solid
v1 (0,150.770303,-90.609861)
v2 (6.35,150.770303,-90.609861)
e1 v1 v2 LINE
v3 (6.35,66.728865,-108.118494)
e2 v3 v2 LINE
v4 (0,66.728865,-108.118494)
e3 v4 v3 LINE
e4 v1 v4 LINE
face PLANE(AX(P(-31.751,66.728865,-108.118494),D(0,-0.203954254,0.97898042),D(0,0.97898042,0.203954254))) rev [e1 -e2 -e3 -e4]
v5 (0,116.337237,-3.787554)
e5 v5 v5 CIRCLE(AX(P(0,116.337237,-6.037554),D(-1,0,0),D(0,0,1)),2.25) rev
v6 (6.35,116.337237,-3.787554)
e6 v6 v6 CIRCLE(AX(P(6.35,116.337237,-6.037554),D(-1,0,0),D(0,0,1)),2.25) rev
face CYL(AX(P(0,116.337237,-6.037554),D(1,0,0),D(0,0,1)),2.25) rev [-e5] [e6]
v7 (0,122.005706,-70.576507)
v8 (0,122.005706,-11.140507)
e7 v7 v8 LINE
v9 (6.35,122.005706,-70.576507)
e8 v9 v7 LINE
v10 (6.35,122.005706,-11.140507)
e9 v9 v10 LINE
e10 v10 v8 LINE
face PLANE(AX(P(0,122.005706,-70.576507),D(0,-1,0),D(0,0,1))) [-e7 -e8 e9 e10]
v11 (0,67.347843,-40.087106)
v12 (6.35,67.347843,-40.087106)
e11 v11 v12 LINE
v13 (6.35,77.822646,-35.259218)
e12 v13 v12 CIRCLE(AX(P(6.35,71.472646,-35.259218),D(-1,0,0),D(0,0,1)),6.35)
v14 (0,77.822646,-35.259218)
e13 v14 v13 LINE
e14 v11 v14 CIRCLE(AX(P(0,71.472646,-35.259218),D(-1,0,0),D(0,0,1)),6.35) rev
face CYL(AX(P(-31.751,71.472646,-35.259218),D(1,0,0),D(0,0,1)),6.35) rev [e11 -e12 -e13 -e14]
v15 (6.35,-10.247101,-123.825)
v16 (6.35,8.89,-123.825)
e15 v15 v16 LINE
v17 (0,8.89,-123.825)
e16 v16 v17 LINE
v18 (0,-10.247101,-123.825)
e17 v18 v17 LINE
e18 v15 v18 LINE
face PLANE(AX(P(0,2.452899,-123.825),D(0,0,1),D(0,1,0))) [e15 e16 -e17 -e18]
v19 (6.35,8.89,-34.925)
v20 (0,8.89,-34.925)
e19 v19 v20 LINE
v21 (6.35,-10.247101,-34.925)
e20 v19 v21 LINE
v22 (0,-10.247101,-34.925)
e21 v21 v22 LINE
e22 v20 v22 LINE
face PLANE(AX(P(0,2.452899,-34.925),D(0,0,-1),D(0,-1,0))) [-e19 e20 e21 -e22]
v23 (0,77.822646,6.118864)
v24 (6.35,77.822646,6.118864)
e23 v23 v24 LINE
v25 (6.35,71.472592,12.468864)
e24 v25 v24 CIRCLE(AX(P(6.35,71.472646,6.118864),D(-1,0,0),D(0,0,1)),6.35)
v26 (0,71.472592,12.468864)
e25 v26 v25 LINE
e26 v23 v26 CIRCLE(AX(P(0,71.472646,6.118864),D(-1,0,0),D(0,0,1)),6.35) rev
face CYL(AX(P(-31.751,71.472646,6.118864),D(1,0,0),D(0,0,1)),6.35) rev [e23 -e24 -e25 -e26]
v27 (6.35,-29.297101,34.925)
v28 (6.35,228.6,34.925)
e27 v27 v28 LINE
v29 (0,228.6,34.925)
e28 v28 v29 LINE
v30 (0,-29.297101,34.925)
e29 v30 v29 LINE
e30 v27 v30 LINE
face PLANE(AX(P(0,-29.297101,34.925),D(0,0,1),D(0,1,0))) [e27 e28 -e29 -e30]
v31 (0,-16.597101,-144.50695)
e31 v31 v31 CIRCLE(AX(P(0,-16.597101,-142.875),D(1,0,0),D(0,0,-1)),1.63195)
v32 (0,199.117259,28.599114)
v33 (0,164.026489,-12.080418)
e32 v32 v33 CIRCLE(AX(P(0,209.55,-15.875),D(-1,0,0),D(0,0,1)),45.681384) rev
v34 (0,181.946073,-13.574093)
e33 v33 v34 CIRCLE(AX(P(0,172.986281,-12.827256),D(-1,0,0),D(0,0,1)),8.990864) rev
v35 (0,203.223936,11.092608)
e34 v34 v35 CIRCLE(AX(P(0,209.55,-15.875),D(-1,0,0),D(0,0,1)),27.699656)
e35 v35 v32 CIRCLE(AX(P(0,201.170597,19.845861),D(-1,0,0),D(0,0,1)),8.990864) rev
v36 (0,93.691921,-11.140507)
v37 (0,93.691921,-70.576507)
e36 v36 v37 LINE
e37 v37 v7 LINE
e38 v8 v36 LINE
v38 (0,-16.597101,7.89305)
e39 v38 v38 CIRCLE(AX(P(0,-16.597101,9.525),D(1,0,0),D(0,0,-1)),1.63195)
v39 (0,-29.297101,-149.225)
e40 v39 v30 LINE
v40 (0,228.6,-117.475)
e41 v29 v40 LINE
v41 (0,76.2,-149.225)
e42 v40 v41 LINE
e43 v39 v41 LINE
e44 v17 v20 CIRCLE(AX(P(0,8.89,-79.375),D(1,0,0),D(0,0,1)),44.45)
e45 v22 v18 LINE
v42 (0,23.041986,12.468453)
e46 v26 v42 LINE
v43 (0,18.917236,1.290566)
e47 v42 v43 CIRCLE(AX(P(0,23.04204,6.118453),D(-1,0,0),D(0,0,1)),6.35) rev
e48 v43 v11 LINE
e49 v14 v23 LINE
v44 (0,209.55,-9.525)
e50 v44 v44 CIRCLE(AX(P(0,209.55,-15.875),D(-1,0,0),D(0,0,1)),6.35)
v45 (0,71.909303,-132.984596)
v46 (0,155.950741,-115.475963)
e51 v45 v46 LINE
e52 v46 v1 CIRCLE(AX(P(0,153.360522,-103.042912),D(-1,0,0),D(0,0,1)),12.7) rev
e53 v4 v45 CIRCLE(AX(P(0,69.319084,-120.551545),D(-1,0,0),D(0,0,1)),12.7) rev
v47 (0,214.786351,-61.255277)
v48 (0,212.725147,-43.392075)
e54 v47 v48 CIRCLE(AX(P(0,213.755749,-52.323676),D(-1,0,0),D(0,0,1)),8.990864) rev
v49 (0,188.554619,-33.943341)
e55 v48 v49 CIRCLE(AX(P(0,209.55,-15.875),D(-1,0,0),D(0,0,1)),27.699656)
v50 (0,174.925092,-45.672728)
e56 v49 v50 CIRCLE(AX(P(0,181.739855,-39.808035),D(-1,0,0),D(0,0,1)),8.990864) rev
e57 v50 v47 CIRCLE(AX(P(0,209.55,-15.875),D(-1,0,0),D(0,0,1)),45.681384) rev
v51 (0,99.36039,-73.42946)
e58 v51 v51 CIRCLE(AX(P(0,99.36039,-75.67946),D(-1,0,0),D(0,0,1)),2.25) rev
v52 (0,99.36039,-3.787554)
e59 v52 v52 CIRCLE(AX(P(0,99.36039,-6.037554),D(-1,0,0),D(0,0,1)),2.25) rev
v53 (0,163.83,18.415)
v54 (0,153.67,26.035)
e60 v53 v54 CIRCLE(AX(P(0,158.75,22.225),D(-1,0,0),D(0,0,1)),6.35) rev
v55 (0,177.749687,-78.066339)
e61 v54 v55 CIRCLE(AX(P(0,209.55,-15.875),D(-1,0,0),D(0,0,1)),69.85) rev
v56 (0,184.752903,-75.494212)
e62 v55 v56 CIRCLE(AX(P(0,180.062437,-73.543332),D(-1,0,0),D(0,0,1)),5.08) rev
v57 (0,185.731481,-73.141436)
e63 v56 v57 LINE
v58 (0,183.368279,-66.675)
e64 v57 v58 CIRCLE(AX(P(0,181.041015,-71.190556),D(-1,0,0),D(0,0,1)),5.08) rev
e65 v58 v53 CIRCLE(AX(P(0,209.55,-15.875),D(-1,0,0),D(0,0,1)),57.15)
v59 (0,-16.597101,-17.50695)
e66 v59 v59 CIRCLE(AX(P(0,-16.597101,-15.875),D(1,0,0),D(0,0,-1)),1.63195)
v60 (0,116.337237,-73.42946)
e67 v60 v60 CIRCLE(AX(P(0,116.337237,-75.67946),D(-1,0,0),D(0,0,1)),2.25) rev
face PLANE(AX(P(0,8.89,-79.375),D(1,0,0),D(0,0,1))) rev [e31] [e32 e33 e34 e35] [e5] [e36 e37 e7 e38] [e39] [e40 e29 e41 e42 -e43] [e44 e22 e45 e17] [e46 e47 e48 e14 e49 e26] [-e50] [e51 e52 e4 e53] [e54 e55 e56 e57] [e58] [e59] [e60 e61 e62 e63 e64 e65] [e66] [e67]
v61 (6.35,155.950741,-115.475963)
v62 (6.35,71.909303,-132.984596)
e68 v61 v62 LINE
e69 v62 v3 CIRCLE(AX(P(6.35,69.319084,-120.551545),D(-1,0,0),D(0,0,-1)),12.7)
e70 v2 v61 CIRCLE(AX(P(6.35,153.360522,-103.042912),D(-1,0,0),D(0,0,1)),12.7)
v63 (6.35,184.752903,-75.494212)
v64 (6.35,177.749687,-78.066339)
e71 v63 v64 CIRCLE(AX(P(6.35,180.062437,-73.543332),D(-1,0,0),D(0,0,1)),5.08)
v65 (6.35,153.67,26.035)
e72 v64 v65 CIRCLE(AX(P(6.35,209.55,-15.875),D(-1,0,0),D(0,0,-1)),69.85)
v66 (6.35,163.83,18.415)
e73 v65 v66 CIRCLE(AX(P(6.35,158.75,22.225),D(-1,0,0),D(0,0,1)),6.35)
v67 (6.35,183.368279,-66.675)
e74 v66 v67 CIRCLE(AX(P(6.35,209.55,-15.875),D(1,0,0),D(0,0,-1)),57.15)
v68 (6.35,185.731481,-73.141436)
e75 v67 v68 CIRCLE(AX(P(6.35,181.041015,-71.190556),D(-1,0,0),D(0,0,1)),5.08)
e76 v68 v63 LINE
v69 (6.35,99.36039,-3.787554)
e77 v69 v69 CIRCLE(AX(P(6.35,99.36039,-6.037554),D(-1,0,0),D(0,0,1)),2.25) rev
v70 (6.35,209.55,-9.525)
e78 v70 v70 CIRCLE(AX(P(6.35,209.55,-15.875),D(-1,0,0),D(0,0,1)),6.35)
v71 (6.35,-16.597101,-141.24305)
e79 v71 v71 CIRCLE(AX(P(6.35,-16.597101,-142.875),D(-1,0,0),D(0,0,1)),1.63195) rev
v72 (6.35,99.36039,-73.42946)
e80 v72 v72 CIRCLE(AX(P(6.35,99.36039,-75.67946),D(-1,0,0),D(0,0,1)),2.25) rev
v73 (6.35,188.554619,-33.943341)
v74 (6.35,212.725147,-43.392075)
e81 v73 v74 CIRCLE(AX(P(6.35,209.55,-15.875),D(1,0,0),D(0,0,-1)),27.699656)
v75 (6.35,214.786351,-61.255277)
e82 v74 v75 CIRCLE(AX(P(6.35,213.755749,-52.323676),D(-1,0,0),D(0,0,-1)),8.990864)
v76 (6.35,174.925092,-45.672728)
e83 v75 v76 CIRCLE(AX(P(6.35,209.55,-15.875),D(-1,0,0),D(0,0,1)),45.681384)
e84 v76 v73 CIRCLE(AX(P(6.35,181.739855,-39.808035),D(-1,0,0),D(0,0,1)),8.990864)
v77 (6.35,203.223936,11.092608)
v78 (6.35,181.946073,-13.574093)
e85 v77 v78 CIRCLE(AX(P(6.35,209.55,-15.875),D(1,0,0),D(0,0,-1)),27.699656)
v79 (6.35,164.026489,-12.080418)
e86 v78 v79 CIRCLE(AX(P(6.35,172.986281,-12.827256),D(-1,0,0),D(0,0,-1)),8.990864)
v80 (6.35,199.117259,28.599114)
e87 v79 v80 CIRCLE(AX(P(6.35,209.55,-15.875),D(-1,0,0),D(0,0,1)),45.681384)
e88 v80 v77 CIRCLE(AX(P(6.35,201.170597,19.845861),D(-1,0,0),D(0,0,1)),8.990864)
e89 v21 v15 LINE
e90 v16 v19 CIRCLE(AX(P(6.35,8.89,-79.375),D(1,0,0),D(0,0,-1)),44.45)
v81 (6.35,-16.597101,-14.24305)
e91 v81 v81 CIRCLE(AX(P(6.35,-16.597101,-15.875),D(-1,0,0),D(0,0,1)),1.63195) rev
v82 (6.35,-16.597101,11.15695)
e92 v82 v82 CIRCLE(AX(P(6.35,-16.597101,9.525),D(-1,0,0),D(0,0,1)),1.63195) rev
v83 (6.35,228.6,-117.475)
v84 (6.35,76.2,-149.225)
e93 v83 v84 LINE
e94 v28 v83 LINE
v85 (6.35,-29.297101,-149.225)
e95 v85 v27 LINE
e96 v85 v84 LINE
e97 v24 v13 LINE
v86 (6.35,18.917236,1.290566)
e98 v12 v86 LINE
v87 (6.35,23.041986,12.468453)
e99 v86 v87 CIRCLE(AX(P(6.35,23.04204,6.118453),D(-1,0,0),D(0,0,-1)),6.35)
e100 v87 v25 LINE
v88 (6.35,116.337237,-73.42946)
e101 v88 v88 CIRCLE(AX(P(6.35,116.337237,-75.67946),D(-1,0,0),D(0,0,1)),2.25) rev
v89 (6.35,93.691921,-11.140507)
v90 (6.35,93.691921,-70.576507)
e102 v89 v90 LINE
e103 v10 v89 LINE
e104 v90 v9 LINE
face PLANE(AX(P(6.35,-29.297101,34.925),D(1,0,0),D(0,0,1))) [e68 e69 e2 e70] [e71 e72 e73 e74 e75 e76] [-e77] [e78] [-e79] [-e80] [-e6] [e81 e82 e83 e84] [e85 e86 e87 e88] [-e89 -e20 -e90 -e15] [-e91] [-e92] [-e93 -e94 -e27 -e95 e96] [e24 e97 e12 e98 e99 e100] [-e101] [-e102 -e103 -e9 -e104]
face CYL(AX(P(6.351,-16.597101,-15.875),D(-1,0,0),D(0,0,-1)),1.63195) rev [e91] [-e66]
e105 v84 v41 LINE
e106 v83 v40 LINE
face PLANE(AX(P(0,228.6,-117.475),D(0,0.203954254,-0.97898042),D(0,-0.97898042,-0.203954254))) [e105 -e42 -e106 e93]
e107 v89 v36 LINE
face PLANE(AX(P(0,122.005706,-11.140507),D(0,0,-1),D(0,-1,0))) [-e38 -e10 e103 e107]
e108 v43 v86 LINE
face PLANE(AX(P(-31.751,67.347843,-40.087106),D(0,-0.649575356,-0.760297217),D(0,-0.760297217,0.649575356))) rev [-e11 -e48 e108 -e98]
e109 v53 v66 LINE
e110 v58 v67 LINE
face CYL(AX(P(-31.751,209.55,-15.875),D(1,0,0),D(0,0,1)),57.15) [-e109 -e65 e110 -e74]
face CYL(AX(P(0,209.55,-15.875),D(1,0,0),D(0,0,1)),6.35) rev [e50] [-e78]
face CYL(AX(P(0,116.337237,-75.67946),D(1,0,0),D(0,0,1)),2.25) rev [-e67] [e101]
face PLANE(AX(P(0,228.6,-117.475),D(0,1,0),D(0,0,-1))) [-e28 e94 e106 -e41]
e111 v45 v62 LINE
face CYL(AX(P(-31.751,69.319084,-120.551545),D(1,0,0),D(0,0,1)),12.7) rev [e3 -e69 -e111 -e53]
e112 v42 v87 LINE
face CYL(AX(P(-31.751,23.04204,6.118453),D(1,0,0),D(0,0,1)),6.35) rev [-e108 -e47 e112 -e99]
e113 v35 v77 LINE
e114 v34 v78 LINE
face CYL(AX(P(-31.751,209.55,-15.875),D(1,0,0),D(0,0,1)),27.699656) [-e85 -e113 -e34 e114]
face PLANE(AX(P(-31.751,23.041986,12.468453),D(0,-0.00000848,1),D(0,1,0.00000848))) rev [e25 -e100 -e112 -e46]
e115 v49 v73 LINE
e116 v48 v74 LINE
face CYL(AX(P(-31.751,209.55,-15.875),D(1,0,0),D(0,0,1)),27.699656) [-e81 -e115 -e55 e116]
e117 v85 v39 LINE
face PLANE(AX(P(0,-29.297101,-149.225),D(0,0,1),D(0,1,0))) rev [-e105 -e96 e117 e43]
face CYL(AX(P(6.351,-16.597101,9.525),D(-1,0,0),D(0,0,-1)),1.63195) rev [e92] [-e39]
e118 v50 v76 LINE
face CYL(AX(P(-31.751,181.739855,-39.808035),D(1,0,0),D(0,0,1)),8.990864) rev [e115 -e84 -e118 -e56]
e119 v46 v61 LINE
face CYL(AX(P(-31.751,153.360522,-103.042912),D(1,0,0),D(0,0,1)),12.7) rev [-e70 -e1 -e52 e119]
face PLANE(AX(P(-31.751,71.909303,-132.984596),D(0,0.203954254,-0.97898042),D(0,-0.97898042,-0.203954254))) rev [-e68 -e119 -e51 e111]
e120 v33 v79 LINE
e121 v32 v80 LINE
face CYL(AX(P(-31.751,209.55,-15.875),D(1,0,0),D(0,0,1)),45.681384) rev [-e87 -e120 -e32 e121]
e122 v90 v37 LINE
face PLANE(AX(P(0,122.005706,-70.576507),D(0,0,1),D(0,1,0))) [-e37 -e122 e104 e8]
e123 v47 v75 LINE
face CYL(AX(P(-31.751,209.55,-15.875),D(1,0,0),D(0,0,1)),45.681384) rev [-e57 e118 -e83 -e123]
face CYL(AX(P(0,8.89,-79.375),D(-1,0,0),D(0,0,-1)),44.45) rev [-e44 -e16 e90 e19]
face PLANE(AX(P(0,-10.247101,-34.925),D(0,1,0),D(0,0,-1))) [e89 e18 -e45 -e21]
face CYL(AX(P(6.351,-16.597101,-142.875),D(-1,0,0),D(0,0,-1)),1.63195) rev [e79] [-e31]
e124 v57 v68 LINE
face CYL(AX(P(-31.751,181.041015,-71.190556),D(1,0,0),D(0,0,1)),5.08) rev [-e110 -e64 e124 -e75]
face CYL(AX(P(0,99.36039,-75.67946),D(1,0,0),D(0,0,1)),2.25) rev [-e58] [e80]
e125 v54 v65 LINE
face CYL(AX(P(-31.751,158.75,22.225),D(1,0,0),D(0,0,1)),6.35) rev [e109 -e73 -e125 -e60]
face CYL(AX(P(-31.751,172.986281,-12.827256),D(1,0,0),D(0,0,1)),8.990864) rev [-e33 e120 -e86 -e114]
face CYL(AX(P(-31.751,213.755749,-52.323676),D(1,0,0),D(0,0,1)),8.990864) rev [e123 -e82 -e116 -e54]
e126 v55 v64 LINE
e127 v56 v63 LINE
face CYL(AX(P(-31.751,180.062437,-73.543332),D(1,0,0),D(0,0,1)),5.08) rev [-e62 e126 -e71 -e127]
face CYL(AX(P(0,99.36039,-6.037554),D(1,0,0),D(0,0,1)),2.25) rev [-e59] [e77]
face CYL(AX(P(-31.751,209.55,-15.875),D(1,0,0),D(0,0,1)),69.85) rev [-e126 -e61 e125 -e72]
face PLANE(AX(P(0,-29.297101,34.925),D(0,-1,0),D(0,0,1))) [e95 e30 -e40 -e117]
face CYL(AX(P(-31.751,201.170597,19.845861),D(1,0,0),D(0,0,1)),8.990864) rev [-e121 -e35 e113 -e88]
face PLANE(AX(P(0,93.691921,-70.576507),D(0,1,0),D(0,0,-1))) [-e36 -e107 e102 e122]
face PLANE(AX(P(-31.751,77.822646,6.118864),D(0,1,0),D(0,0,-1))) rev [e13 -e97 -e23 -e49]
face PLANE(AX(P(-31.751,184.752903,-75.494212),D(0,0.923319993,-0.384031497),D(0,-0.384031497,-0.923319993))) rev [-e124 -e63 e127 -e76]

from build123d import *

# Parameters (mm, degrees)
BOSS_EXTRUDE1_DEPTH           = 6.35
SKETCH5_W                     = 184.15
SKETCH5_H                     = 6.35
BOSS_EXTRUDE4_DEPTH           = 31.75
SKETCH6_W                     = 12.7
SKETCH6_H                     = 88.9
CUT_EXTRUDE2_DEPTH            = 270.576010849
CUT_EXTRUDE3_REACH            = 277.64
SKETCH7_R                     = 2.25
SKETCH7_W                     = 59.436
SKETCH7_H                     = 28.313784743
SKETCH8_R                     = 6.35
CUT_EXTRUDE4_DEPTH            = 276.640473489
FILLET1_R                     = 2.54
CONVERT_SOLID1_START          = -34.925
CONVERT_SOLID1_DEPTH          = 184.15
CUT_EXTRUDE5_REACH            = 277.64
CUT_EXTRUDE6_REACH            = 271.576
SKETCH10_R                    = 1.63195
FLAT_PATTERN1_START           = -31.75
FLAT_PATTERN1_DEPTH           = 31.75
FLAT_PATTERN1_2_OUTLINE_R     = 1.63195
FLAT_PATTERN1_2_DEPTH         = 6.35
BODY_MOVE_COPY1_OUTLINE_R     = 1.63195
BODY_MOVE_COPY1_OUTLINE_R_2   = 2.25
BODY_MOVE_COPY1_OUTLINE_W     = 28.313784743
BODY_MOVE_COPY1_OUTLINE_H     = 23.784493131
BODY_MOVE_COPY1_DEPTH         = 6.35
BODY_MOVE_COPY1_2_OUTLINE_R   = 1.63195
BODY_MOVE_COPY1_2_OUTLINE_R_2 = 2.25
BODY_MOVE_COPY1_2_OUTLINE_W   = 28.313784743
BODY_MOVE_COPY1_2_OUTLINE_H   = 23.784493131
BODY_MOVE_COPY1_2_DEPTH       = 6.35


# Read off the part's stored shape, not the designer's step: Convert-Solid1, Flat-Pattern1, Body-Move/Copy1
with BuildPart() as part:
    # Sketch1 → Boss-Extrude1 (new body)
    with BuildSketch(Plane(origin=(0, 0, 0), x_dir=(0, 0, -1), z_dir=(1, 0, 0))):
        with BuildLine():
            Line((-117.475, 228.6), (34.925, 228.6))
            Line((34.925, 228.6), (34.925, 8.89))
            Line((34.925, 8.89), (34.925, 0))
            Line((34.925, 0), (-34.925, 0))
            Line((-34.925, 0), (-34.925, 8.89))
            ThreePointArc((-34.925, 8.89), (-79.375, 53.34), (-123.825, 8.89))
            Line((-123.825, 8.89), (-123.825, 0))
            Line((-123.825, 0), (-149.225, 0))
            Line((-149.225, 0), (-149.225, 76.2))
            Line((-149.225, 76.2), (-117.475, 228.6))
        make_face()
    extrude(amount=BOSS_EXTRUDE1_DEPTH)

    # Sketch5 → Boss-Extrude4 (add)
    with BuildSketch(Plane.ZY):
        with Locations((57.15, 3.175)):
            Rectangle(SKETCH5_W, SKETCH5_H)
    extrude(amount=BOSS_EXTRUDE4_DEPTH)

    # Sketch6 → Cut-Extrude2 (cut, through all)
    with BuildSketch(Plane(origin=(0, 6.35, 0), x_dir=(1, 0, 0), z_dir=(0, 1, 0))):
        with Locations((-6.35, -79.375)):
            Rectangle(SKETCH6_W, SKETCH6_H)
    extrude(amount=-CUT_EXTRUDE2_DEPTH, mode=Mode.SUBTRACT)

    # Sketch7 → Cut-Extrude3 (cut, up to next)
    with BuildSketch(Plane(origin=(6.35, 0, 0), x_dir=(0, 0, -1), z_dir=(1, 0, 0)), mode=Mode.PRIVATE) as cut_extrude3_sk1:
        with Locations((-75.679460058, 116.337237118)):
            Circle(SKETCH7_R)
    cut_extrude3_tool1 = extrude(cut_extrude3_sk1.sketch, amount=-CUT_EXTRUDE3_REACH, mode=Mode.PRIVATE) & part.part
    # Sketch7 → Cut-Extrude3 (cut, up to next)
    with BuildSketch(Plane(origin=(6.35, 0, 0), x_dir=(0, 0, -1), z_dir=(1, 0, 0)), mode=Mode.PRIVATE) as cut_extrude3_sk2:
        with Locations((-75.679460058, 99.360389657)):
            Circle(SKETCH7_R)
    cut_extrude3_tool2 = extrude(cut_extrude3_sk2.sketch, amount=-CUT_EXTRUDE3_REACH, mode=Mode.PRIVATE) & part.part
    # Sketch7 → Cut-Extrude3 (cut, up to next)
    with BuildSketch(Plane(origin=(6.35, 0, 0), x_dir=(0, 0, -1), z_dir=(1, 0, 0)), mode=Mode.PRIVATE) as cut_extrude3_sk3:
        with Locations((-6.03755368, 99.360389657)):
            Circle(SKETCH7_R)
    cut_extrude3_tool3 = extrude(cut_extrude3_sk3.sketch, amount=-CUT_EXTRUDE3_REACH, mode=Mode.PRIVATE) & part.part
    # Sketch7 → Cut-Extrude3 (cut, up to next)
    with BuildSketch(Plane(origin=(6.35, 0, 0), x_dir=(0, 0, -1), z_dir=(1, 0, 0)), mode=Mode.PRIVATE) as cut_extrude3_sk4:
        with Locations((-6.03755368, 116.337237118)):
            Circle(SKETCH7_R)
    cut_extrude3_tool4 = extrude(cut_extrude3_sk4.sketch, amount=-CUT_EXTRUDE3_REACH, mode=Mode.PRIVATE) & part.part
    # Sketch7 → Cut-Extrude3 (cut, up to next)
    with BuildSketch(Plane(origin=(6.35, 0, 0), x_dir=(0, 0, -1), z_dir=(1, 0, 0)), mode=Mode.PRIVATE) as cut_extrude3_sk5:
        with Locations((-40.858506869, 107.848813388)):
            Rectangle(SKETCH7_W, SKETCH7_H)
    cut_extrude3_tool5 = extrude(cut_extrude3_sk5.sketch, amount=-CUT_EXTRUDE3_REACH, mode=Mode.PRIVATE) & part.part
    add(cut_extrude3_tool1.solids().sort_by_distance((6.35, 116.337237, 75.67946))[0], mode=Mode.SUBTRACT)
    add(cut_extrude3_tool2.solids().sort_by_distance((6.35, 99.36039, 75.67946))[0], mode=Mode.SUBTRACT)
    add(cut_extrude3_tool3.solids().sort_by_distance((6.35, 99.36039, 6.037554))[0], mode=Mode.SUBTRACT)
    add(cut_extrude3_tool4.solids().sort_by_distance((6.35, 116.337237, 6.037554))[0], mode=Mode.SUBTRACT)
    add(cut_extrude3_tool5.solids().sort_by_distance((6.35, 107.848813, 40.858507))[0], mode=Mode.SUBTRACT)

    # Sketch8 → Cut-Extrude4 (cut, through all)
    with BuildSketch(Plane(origin=(6.35, 0, 0), x_dir=(0, 0, -1), z_dir=(1, 0, 0))):
        with Locations((-15.875, 209.55)):
            Circle(SKETCH8_R)
    extrude(amount=-CUT_EXTRUDE4_DEPTH, mode=Mode.SUBTRACT)

    # Fillet1
    fillet1_edges = [part.edges().sort_by_distance(p)[0] for p in [
        (0, 6.35, 136.525),
        (0, 6.35, 0),
    ]]
    fillet(fillet1_edges, radius=FILLET1_R)

    # Convert-Solid1 outline → Convert-Solid1 (cut)
    with BuildSketch(Plane.XY.offset(CONVERT_SOLID1_START)):
        with BuildLine():
            ThreePointArc((6.35, 8.89), (3.746179285, 2.603820715), (-2.54, 0))
            Line((-2.54, 0), (6.35, 0))
            Line((6.35, 0), (6.35, 8.89))
        make_face()
    extrude(amount=CONVERT_SOLID1_DEPTH, mode=Mode.SUBTRACT)

    # Sketch9 → Cut-Extrude5 (cut, up to next)
    with BuildSketch(Plane(origin=(6.35, 0, 0), x_dir=(0, 0, -1), z_dir=(1, 0, 0)), mode=Mode.PRIVATE) as cut_extrude5_sk1:
        with BuildLine():
            Line((-75.494212356, 184.752903033), (-73.141435562, 185.731480776))
            ThreePointArc((-73.141435562, 185.731480776), (-69.446832384, 185.812370314), (-66.675, 183.368279277))
            ThreePointArc((-66.675, 183.368279277), (-28.664883279, 153.84953873), (18.415, 163.83))
            ThreePointArc((18.415, 163.83), (27.305, 162.56), (26.035, 153.67))
            ThreePointArc((26.035, 153.67), (-31.616379009, 141.496848075), (-78.066338809, 177.749687467))
            ThreePointArc((-78.066338809, 177.749687467), (-78.311881244, 181.813820193), (-75.494212356, 184.752903033))
        make_face()
    cut_extrude5_tool1 = extrude(cut_extrude5_sk1.sketch, amount=-CUT_EXTRUDE5_REACH, mode=Mode.PRIVATE) & part.part
    # Sketch9 → Cut-Extrude5 (cut, up to next)
    with BuildSketch(Plane(origin=(6.35, 0, 0), x_dir=(0, 0, -1), z_dir=(1, 0, 0)), mode=Mode.PRIVATE) as cut_extrude5_sk2:
        with BuildLine():
            Line((-108.118493719, 66.728864942), (-90.609860799, 150.770302958))
            ThreePointArc((-90.609860799, 150.770302958), (-100.452693102, 165.793573316), (-115.47596346, 155.950741012))
            Line((-115.47596346, 155.950741012), (-132.98459638, 71.909302996))
            ThreePointArc((-132.98459638, 71.909302996), (-123.141764077, 56.886032638), (-108.118493719, 66.728864942))
        make_face()
    cut_extrude5_tool2 = extrude(cut_extrude5_sk2.sketch, amount=-CUT_EXTRUDE5_REACH, mode=Mode.PRIVATE) & part.part
    # Sketch9 → Cut-Extrude5 (cut, up to next)
    with BuildSketch(Plane(origin=(6.35, 0, 0), x_dir=(0, 0, -1), z_dir=(1, 0, 0)), mode=Mode.PRIVATE) as cut_extrude5_sk3:
        with BuildLine():
            Line((-40.087105739, 67.347842772), (1.2905656, 18.917236412))
            ThreePointArc((1.2905656, 18.917236412), (8.316769711, 17.084699632), (12.468452925, 23.041986075))
            Line((12.468452925, 23.041986075), (12.468863596, 71.472592434))
            ThreePointArc((12.468863596, 71.472592434), (10.609010694, 75.962755303), (6.118863596, 77.82264628))
            Line((6.118863596, 77.82264628), (-35.259218414, 77.82264628))
            ThreePointArc((-35.259218414, 77.82264628), (-41.026150106, 74.130652838), (-40.087105739, 67.347842772))
        make_face()
    cut_extrude5_tool3 = extrude(cut_extrude5_sk3.sketch, amount=-CUT_EXTRUDE5_REACH, mode=Mode.PRIVATE) & part.part
    # Sketch9 → Cut-Extrude5 (cut, up to next)
    with BuildSketch(Plane(origin=(6.35, 0, 0), x_dir=(0, 0, -1), z_dir=(1, 0, 0)), mode=Mode.PRIVATE) as cut_extrude5_sk4:
        with BuildLine():
            ThreePointArc((-61.255276679, 214.786351204), (-58.421011662, 192.917929262), (-45.672728213, 174.925091643))
            ThreePointArc((-45.672728213, 174.925091643), (-32.993270754, 175.875161813), (-33.943340924, 188.554619273))
            ThreePointArc((-33.943340924, 188.554619273), (-41.673471553, 199.464871288), (-43.392074603, 212.725147383))
            ThreePointArc((-43.392074603, 212.725147383), (-51.29307373, 222.687350332), (-61.255276679, 214.786351204))
        make_face()
    cut_extrude5_tool4 = extrude(cut_extrude5_sk4.sketch, amount=-CUT_EXTRUDE5_REACH, mode=Mode.PRIVATE) & part.part
    # Sketch9 → Cut-Extrude5 (cut, up to next)
    with BuildSketch(Plane(origin=(6.35, 0, 0), x_dir=(0, 0, -1), z_dir=(1, 0, 0)), mode=Mode.PRIVATE) as cut_extrude5_sk5:
        with BuildLine():
            ThreePointArc((-12.080418407, 164.026489196), (13.963017041, 174.959804504), (28.599113727, 199.117258578))
            ThreePointArc((28.599113727, 199.117258578), (21.899199613, 209.923850348), (11.092607844, 203.223936233))
            ThreePointArc((11.092607844, 203.223936233), (2.217770715, 188.575667985), (-13.574093253, 181.946073037))
            ThreePointArc((-13.574093253, 181.946073037), (-21.787047751, 172.239443693), (-12.080418407, 164.026489196))
        make_face()
    cut_extrude5_tool5 = extrude(cut_extrude5_sk5.sketch, amount=-CUT_EXTRUDE5_REACH, mode=Mode.PRIVATE) & part.part
    add(cut_extrude5_tool1.solids().sort_by_distance((6.35, 181.411079, 77.215324))[0], mode=Mode.SUBTRACT)
    add(cut_extrude5_tool2.solids().sort_by_distance((6.35, 111.339803, 111.797229))[0], mode=Mode.SUBTRACT)
    add(cut_extrude5_tool3.solids().sort_by_distance((6.35, 54.455432, 7.917782))[0], mode=Mode.SUBTRACT)
    add(cut_extrude5_tool4.solids().sort_by_distance((6.35, 197.006846, 47.961274))[0], mode=Mode.SUBTRACT)
    add(cut_extrude5_tool5.solids().sort_by_distance((6.35, 184.385964, -5.831872))[0], mode=Mode.SUBTRACT)

    # Sketch10 → Cut-Extrude6 (cut, up to next)
    with BuildSketch(Plane(origin=(0, 6.35, 0), x_dir=(1, 0, 0), z_dir=(0, 1, 0)), mode=Mode.PRIVATE) as cut_extrude6_sk1:
        with Locations(Location((-19.05, 9.525, 0), (0, 0, 270))):
            Circle(SKETCH10_R)
    cut_extrude6_tool1 = extrude(cut_extrude6_sk1.sketch, amount=-CUT_EXTRUDE6_REACH, mode=Mode.PRIVATE) & part.part
    # Sketch10 → Cut-Extrude6 (cut, up to next)
    with BuildSketch(Plane(origin=(0, 6.35, 0), x_dir=(1, 0, 0), z_dir=(0, 1, 0)), mode=Mode.PRIVATE) as cut_extrude6_sk2:
        with Locations(Location((-19.05, -15.875, 0), (0, 0, 270))):
            Circle(SKETCH10_R)
    cut_extrude6_tool2 = extrude(cut_extrude6_sk2.sketch, amount=-CUT_EXTRUDE6_REACH, mode=Mode.PRIVATE) & part.part
    # Sketch10 → Cut-Extrude6 (cut, up to next)
    with BuildSketch(Plane(origin=(0, 6.35, 0), x_dir=(1, 0, 0), z_dir=(0, 1, 0)), mode=Mode.PRIVATE) as cut_extrude6_sk3:
        with Locations(Location((-19.05, -142.875, 0), (0, 0, 270))):
            Circle(SKETCH10_R)
    cut_extrude6_tool3 = extrude(cut_extrude6_sk3.sketch, amount=-CUT_EXTRUDE6_REACH, mode=Mode.PRIVATE) & part.part
    add(cut_extrude6_tool1.solids().sort_by_distance((-19.05, 6.35, -9.525))[0], mode=Mode.SUBTRACT)
    add(cut_extrude6_tool2.solids().sort_by_distance((-19.05, 6.35, 15.875))[0], mode=Mode.SUBTRACT)
    add(cut_extrude6_tool3.solids().sort_by_distance((-19.05, 6.35, 142.875))[0], mode=Mode.SUBTRACT)

    # Flat-Pattern1 outline → Flat-Pattern1 (cut)
    with BuildSketch(Plane.YZ.offset(FLAT_PATTERN1_START)):
        Polygon((0, 149.225), (0, -34.925), (10, -34.925), (10, 34.925), (6.35, 34.925), (6.35, 123.825), (10, 123.825), (10, 149.225), align=None)
    extrude(amount=FLAT_PATTERN1_DEPTH, mode=Mode.SUBTRACT)

    # Flat-Pattern1 2 outline → Flat-Pattern1 2 (add)
    with BuildSketch(Plane.YZ):
        Polygon((-29.297101008, 149.225), (-29.297101008, -34.925), (10, -34.925), (10, 34.925), (-10.247101008, 34.925), (-10.247101008, 123.825), (10, 123.825), (10, 149.225), align=None)
        with Locations((-16.597101008, -9.525)):
            Circle(FLAT_PATTERN1_2_OUTLINE_R, mode=Mode.SUBTRACT)
        with Locations((-16.597101008, 15.875)):
            Circle(FLAT_PATTERN1_2_OUTLINE_R, mode=Mode.SUBTRACT)
        with Locations((-16.597101008, 142.875)):
            Circle(FLAT_PATTERN1_2_OUTLINE_R, mode=Mode.SUBTRACT)
    extrude(amount=FLAT_PATTERN1_2_DEPTH)

    # Body-Move/Copy1 outline → Body-Move/Copy1 (cut)
    # profile 1 of 14: a face of its own
    with BuildSketch(Plane.YZ):
        with BuildLine():
            Line((-29.297101008, 149.225), (-29.297101008, 34.925))
            Line((-29.297101008, 34.925), (-10.247101008, 34.925))
            Line((-10.247101008, 34.925), (-10.247101008, 123.825))
            Line((-10.247101008, 123.825), (8.89, 123.825))
            ThreePointArc((8.89, 123.825), (53.34, 79.375), (8.89, 34.925))
            Line((8.89, 34.925), (61.305842269, 34.925))
            Line((61.305842269, 34.925), (67.347842772, 40.087105739))
            ThreePointArc((67.347842772, 40.087105739), (74.130652838, 41.026150106), (77.82264628, 35.259218414))
            Line((77.82264628, 35.259218414), (77.82264628, 34.925))
            Line((77.82264628, 34.925), (93.691921016, 34.925))
            Line((93.691921016, 34.925), (93.691921016, 70.576506869))
            Line((93.691921016, 70.576506869), (122.005705759, 70.576506869))
            Line((122.005705759, 70.576506869), (122.005705759, 34.925))
            Line((122.005705759, 34.925), (142.347916699, 34.925))
            ThreePointArc((142.347916699, 34.925), (155.553126259, 60.18481975), (177.749687467, 78.066338809))
            ThreePointArc((177.749687467, 78.066338809), (181.813820193, 78.311881244), (184.752903033, 75.494212356))
            Line((184.752903033, 75.494212356), (185.731480776, 73.141435562))
            ThreePointArc((185.731480776, 73.141435562), (185.812370314, 69.446832384), (183.368279277, 66.675))
            ThreePointArc((183.368279277, 66.675), (166.485549193, 53.445940588), (155.668463274, 34.925))
            Line((155.668463274, 34.925), (174.190576632, 34.925))
            ThreePointArc((174.190576632, 34.925), (172.769914227, 40.421053093), (174.925091643, 45.672728213))
            ThreePointArc((174.925091643, 45.672728213), (192.917929261, 58.421011662), (214.786351204, 61.255276679))
            ThreePointArc((214.786351204, 61.255276679), (222.687350332, 51.29307373), (212.725147383, 43.392074603))
            ThreePointArc((212.725147383, 43.392074603), (200.083693536, 41.906903456), (189.441085171, 34.925))
            Line((189.441085171, 34.925), (228.6, 34.925))
            Line((228.6, 34.925), (228.6, 117.475))
            Line((228.6, 117.475), (76.2, 149.225))
            Line((76.2, 149.225), (-29.297101008, 149.225))
        make_face()
        with Locations((-16.597101008, 142.875)):
            Circle(BODY_MOVE_COPY1_OUTLINE_R, mode=Mode.SUBTRACT)
        with Locations((99.360389657, 75.679460058)):
            Circle(BODY_MOVE_COPY1_OUTLINE_R_2, mode=Mode.SUBTRACT)
        with Locations((116.337237118, 75.679460058)):
            Circle(BODY_MOVE_COPY1_OUTLINE_R_2, mode=Mode.SUBTRACT)
        with BuildLine():
            ThreePointArc((155.950741012, 115.47596346), (165.793573316, 100.452693102), (150.770302958, 90.609860799))
            Line((150.770302958, 90.609860799), (66.728864942, 108.118493719))
            ThreePointArc((66.728864942, 108.118493719), (56.886032638, 123.141764077), (71.909302996, 132.98459638))
            Line((71.909302996, 132.98459638), (155.950741012, 115.47596346))
        make_face(mode=Mode.SUBTRACT)
    # profile 2 of 14: a face of its own
    with BuildSketch(Plane.YZ):
        with BuildLine():
            Line((35.021635432, -12.468554507), (61.305842269, -34.925))
            Line((61.305842269, -34.925), (77.82264628, -34.925))
            Line((77.82264628, -34.925), (77.82264628, -6.118863596))
            ThreePointArc((77.82264628, -6.118863596), (75.962755303, -10.609010694), (71.472592434, -12.468863596))
            Line((71.472592434, -12.468863596), (35.021635432, -12.468554507))
        make_face()
    # profile 3 of 14: a face of its own
    with BuildSketch(Plane.YZ):
        with BuildLine():
            Line((20.427782379, 0), (35.021635432, 12.468554507))
            Line((35.021635432, 12.468554507), (23.041986075, 12.468452925))
            ThreePointArc((23.041986075, 12.468452925), (17.084699632, 8.316769712), (18.917236412, 1.2905656))
            Line((18.917236412, 1.2905656), (20.427782379, 0))
        make_face()
    # profile 4 of 14: a face of its own
    with BuildSketch(Plane.YZ):
        with BuildLine():
            Line((174.190576632, -34.925), (189.441085171, -34.925))
            ThreePointArc((189.441085171, -34.925), (188.991992024, -34.439462386), (188.554619273, -33.943340924))
            ThreePointArc((188.554619273, -33.943340924), (181.126836934, -30.838093338), (174.190576632, -34.925))
        make_face()
    # profile 5 of 14: a face of its own
    with BuildSketch(Plane.YZ):
        with Locations((107.848813388, -23.032753435)):
            Rectangle(BODY_MOVE_COPY1_OUTLINE_W, BODY_MOVE_COPY1_OUTLINE_H)
    # profile 6 of 14: a face of its own
    with BuildSketch(Plane.YZ):
        with BuildLine():
            Line((142.347916699, -34.925), (155.668463274, -34.925))
            ThreePointArc((155.668463274, -34.925), (154.228524049, -30.215739123), (153.199340066, -25.4))
            ThreePointArc((153.199340066, -25.4), (146.080036923, -13.289812481), (141.527894218, 0))
            ThreePointArc((141.527894218, 0), (139.719245783, -17.51459308), (142.347916699, -34.925))
        make_face()
    # profile 7 of 14: a face of its own
    with BuildSketch(Plane.YZ):
        with BuildLine():
            ThreePointArc((153.67, 26.035), (153.433771834, 25.718165742), (153.199340066, 25.4))
            ThreePointArc((153.199340066, 25.4), (152.492867132, 12.618300933), (154.649117721, 0))
            ThreePointArc((154.649117721, 0), (158.403948893, 9.624097163), (163.83, 18.415))
            ThreePointArc((163.83, 18.415), (162.56, 27.305), (153.67, 26.035))
        make_face()
    # profile 8 of 14: a face of its own
    with BuildSketch(Plane.YZ):
        with Locations((-16.597101008, 9.525)):
            Circle(BODY_MOVE_COPY1_OUTLINE_R)
    # profile 9 of 14: a face of its own
    with BuildSketch(Plane.YZ):
        with Locations((-16.597101008, -15.875)):
            Circle(BODY_MOVE_COPY1_OUTLINE_R)
    # profile 10 of 14: a face of its own
    with BuildSketch(Plane.YZ):
        with Locations((99.360389657, -6.03755368)):
            Circle(BODY_MOVE_COPY1_OUTLINE_R_2)
    # profile 11 of 14: a face of its own
    with BuildSketch(Plane.YZ):
        with Locations((116.337237118, -6.03755368)):
            Circle(BODY_MOVE_COPY1_OUTLINE_R_2)
    # profile 12 of 14: a face of its own
    with BuildSketch(Plane.YZ):
        with BuildLine():
            ThreePointArc((209.842819187, -22.218244984), (215.288292733, -13.155717648), (204.825992987, -11.631621895))
            ThreePointArc((204.825992987, -11.631621895), (209.295354914, -15.995672109), (209.842819187, -22.218244984))
        make_face()
    # profile 13 of 14: a face of its own
    with BuildSketch(Plane.YZ):
        with BuildLine():
            ThreePointArc((181.946073037, 13.574093253), (183.498780036, 6.461982735), (186.850763656, 0))
            ThreePointArc((186.850763656, 0), (194.01363946, 7.057345209), (203.223936233, 11.092607844))
            ThreePointArc((203.223936233, 11.092607844), (204.037659695, 11.324382555), (204.825992987, 11.631621895))
            ThreePointArc((204.825992987, 11.631621895), (203.811707267, 18.594282352), (209.842819187, 22.218244984))
            ThreePointArc((209.842819187, 22.218244984), (205.767473994, 27.572720629), (199.117258578, 28.599113727))
            ThreePointArc((199.117258578, 28.599113727), (188.840201826, 24.842234005), (179.751394837, 18.749153646))
            ThreePointArc((179.751394837, 18.749153646), (181.263567923, 16.33754934), (181.946073037, 13.574093253))
        make_face()
    # profile 14 of 14: a face of its own
    with BuildSketch(Plane.YZ):
        with BuildLine():
            ThreePointArc((164.026489196, -12.080418407), (169.475987607, -21.104542637), (179.751394837, -18.749153646))
            ThreePointArc((179.751394837, -18.749153646), (172.043124301, -10.202253703), (166.715746646, 0))
            ThreePointArc((166.715746646, 0), (164.960116069, -5.948714873), (164.026489196, -12.080418407))
        make_face()
    extrude(amount=BODY_MOVE_COPY1_DEPTH, mode=Mode.SUBTRACT)

    # Body-Move_Copy1 2 outline → Body-Move_Copy1 2 (add)
    # profile 1 of 14: a face of its own
    with BuildSketch(Plane.YZ):
        with BuildLine():
            Line((-10.247101008, -34.925), (-29.297101008, -34.925))
            Line((-29.297101008, -34.925), (-29.297101008, -149.225))
            Line((-29.297101008, -149.225), (76.2, -149.225))
            Line((76.2, -149.225), (228.6, -117.475))
            Line((228.6, -117.475), (228.6, -34.925))
            Line((228.6, -34.925), (189.441085171, -34.925))
            ThreePointArc((189.441085171, -34.925), (200.083693536, -41.906903456), (212.725147383, -43.392074603))
            ThreePointArc((212.725147383, -43.392074603), (222.687350332, -51.29307373), (214.786351204, -61.255276679))
            ThreePointArc((214.786351204, -61.255276679), (192.917929261, -58.421011662), (174.925091643, -45.672728213))
            ThreePointArc((174.925091643, -45.672728213), (172.769914227, -40.421053093), (174.190576632, -34.925))
            Line((174.190576632, -34.925), (155.668463274, -34.925))
            ThreePointArc((155.668463274, -34.925), (166.485549193, -53.445940588), (183.368279277, -66.675))
            ThreePointArc((183.368279277, -66.675), (185.812370314, -69.446832384), (185.731480776, -73.141435562))
            Line((185.731480776, -73.141435562), (184.752903033, -75.494212356))
            ThreePointArc((184.752903033, -75.494212356), (181.813820193, -78.311881244), (177.749687467, -78.066338809))
            ThreePointArc((177.749687467, -78.066338809), (155.553126259, -60.18481975), (142.347916699, -34.925))
            Line((142.347916699, -34.925), (122.005705759, -34.925))
            Line((122.005705759, -34.925), (122.005705759, -70.576506869))
            Line((122.005705759, -70.576506869), (93.691921016, -70.576506869))
            Line((93.691921016, -70.576506869), (93.691921016, -34.925))
            Line((93.691921016, -34.925), (77.82264628, -34.925))
            Line((77.82264628, -34.925), (77.82264628, -35.259218414))
            ThreePointArc((77.82264628, -35.259218414), (74.130652838, -41.026150106), (67.347842772, -40.087105739))
            Line((67.347842772, -40.087105739), (61.305842269, -34.925))
            Line((61.305842269, -34.925), (8.89, -34.925))
            ThreePointArc((8.89, -34.925), (53.34, -79.375), (8.89, -123.825))
            Line((8.89, -123.825), (-10.247101008, -123.825))
            Line((-10.247101008, -123.825), (-10.247101008, -34.925))
        make_face()
        with Locations((-16.597101008, -142.875)):
            Circle(BODY_MOVE_COPY1_2_OUTLINE_R, mode=Mode.SUBTRACT)
        with Locations((99.360389657, -75.679460058)):
            Circle(BODY_MOVE_COPY1_2_OUTLINE_R_2, mode=Mode.SUBTRACT)
        with BuildLine():
            ThreePointArc((150.770302958, -90.609860799), (165.793573316, -100.452693102), (155.950741012, -115.47596346))
            Line((155.950741012, -115.47596346), (71.909302996, -132.98459638))
            ThreePointArc((71.909302996, -132.98459638), (56.886032638, -123.141764077), (66.728864942, -108.118493719))
            Line((66.728864942, -108.118493719), (150.770302958, -90.609860799))
        make_face(mode=Mode.SUBTRACT)
        with Locations((116.337237118, -75.679460058)):
            Circle(BODY_MOVE_COPY1_2_OUTLINE_R_2, mode=Mode.SUBTRACT)
    # profile 2 of 14: a face of its own
    with BuildSketch(Plane.YZ):
        with BuildLine():
            Line((77.82264628, 34.925), (61.305842269, 34.925))
            Line((61.305842269, 34.925), (35.021635432, 12.468554507))
            Line((35.021635432, 12.468554507), (71.472592434, 12.468863596))
            ThreePointArc((71.472592434, 12.468863596), (75.962755303, 10.609010694), (77.82264628, 6.118863596))
            Line((77.82264628, 6.118863596), (77.82264628, 34.925))
        make_face()
    # profile 3 of 14: a face of its own
    with BuildSketch(Plane.YZ):
        with BuildLine():
            Line((23.041986075, -12.468452925), (35.021635432, -12.468554507))
            Line((35.021635432, -12.468554507), (20.427782379, 0))
            Line((20.427782379, 0), (18.917236412, -1.2905656))
            ThreePointArc((18.917236412, -1.2905656), (17.084699632, -8.316769712), (23.041986075, -12.468452925))
        make_face()
    # profile 4 of 14: a face of its own
    with BuildSketch(Plane.YZ):
        with Locations((107.848813388, 23.032753435)):
            Rectangle(BODY_MOVE_COPY1_2_OUTLINE_W, BODY_MOVE_COPY1_2_OUTLINE_H)
    # profile 5 of 14: a face of its own
    with BuildSketch(Plane.YZ):
        with BuildLine():
            ThreePointArc((188.554619273, 33.943340924), (188.991992024, 34.439462386), (189.441085171, 34.925))
            Line((189.441085171, 34.925), (174.190576632, 34.925))
            ThreePointArc((174.190576632, 34.925), (181.126836934, 30.838093338), (188.554619273, 33.943340924))
        make_face()
    # profile 6 of 14: a face of its own
    with BuildSketch(Plane.YZ):
        with BuildLine():
            Line((155.668463274, 34.925), (142.347916699, 34.925))
            ThreePointArc((142.347916699, 34.925), (139.719245783, 17.51459308), (141.527894218, 0))
            ThreePointArc((141.527894218, 0), (146.080036923, 13.289812481), (153.199340066, 25.4))
            ThreePointArc((153.199340066, 25.4), (154.228524049, 30.215739123), (155.668463274, 34.925))
        make_face()
    # profile 7 of 14: a face of its own
    with BuildSketch(Plane.YZ):
        with BuildLine():
            ThreePointArc((154.649117721, 0), (152.492867132, -12.618300933), (153.199340066, -25.4))
            ThreePointArc((153.199340066, -25.4), (153.433771834, -25.718165742), (153.67, -26.035))
            ThreePointArc((153.67, -26.035), (162.56, -27.305), (163.83, -18.415))
            ThreePointArc((163.83, -18.415), (158.403948893, -9.624097163), (154.649117721, 0))
        make_face()
    # profile 8 of 14: a face of its own
    with BuildSketch(Plane.YZ):
        with BuildLine():
            ThreePointArc((209.842819187, -22.218244984), (203.811707267, -18.594282352), (204.825992987, -11.631621895))
            ThreePointArc((204.825992987, -11.631621895), (204.037659695, -11.324382555), (203.223936233, -11.092607844))
            ThreePointArc((203.223936233, -11.092607844), (194.01363946, -7.057345209), (186.850763656, 0))
            ThreePointArc((186.850763656, 0), (183.498780036, -6.461982735), (181.946073037, -13.574093253))
            ThreePointArc((181.946073037, -13.574093253), (181.263567923, -16.33754934), (179.751394837, -18.749153646))
            ThreePointArc((179.751394837, -18.749153646), (188.840201826, -24.842234005), (199.117258578, -28.599113727))
            ThreePointArc((199.117258578, -28.599113727), (205.767473994, -27.572720629), (209.842819187, -22.218244984))
        make_face()
    # profile 9 of 14: a face of its own
    with BuildSketch(Plane.YZ):
        with BuildLine():
            ThreePointArc((164.026489196, 12.080418407), (164.960116069, 5.948714873), (166.715746646, 0))
            ThreePointArc((166.715746646, 0), (172.043124301, 10.202253703), (179.751394837, 18.749153646))
            ThreePointArc((179.751394837, 18.749153646), (169.475987607, 21.104542637), (164.026489196, 12.080418407))
        make_face()
    # profile 10 of 14: a face of its own
    with BuildSketch(Plane.YZ):
        with BuildLine():
            ThreePointArc((209.842819187, 22.218244984), (209.295354914, 15.995672109), (204.825992987, 11.631621895))
            ThreePointArc((204.825992987, 11.631621895), (215.288292733, 13.155717648), (209.842819187, 22.218244984))
        make_face()
    # profile 11 of 14: a face of its own
    with BuildSketch(Plane.YZ):
        with Locations((-16.597101008, -9.525)):
            Circle(BODY_MOVE_COPY1_2_OUTLINE_R)
    # profile 12 of 14: a face of its own
    with BuildSketch(Plane.YZ):
        with Locations((-16.597101008, 15.875)):
            Circle(BODY_MOVE_COPY1_2_OUTLINE_R)
    # profile 13 of 14: a face of its own
    with BuildSketch(Plane.YZ):
        with Locations((99.360389657, 6.03755368)):
            Circle(BODY_MOVE_COPY1_2_OUTLINE_R_2)
    # profile 14 of 14: a face of its own
    with BuildSketch(Plane.YZ):
        with Locations((116.337237118, 6.03755368)):
            Circle(BODY_MOVE_COPY1_2_OUTLINE_R_2)
    extrude(amount=BODY_MOVE_COPY1_2_DEPTH)


solid = part.part
